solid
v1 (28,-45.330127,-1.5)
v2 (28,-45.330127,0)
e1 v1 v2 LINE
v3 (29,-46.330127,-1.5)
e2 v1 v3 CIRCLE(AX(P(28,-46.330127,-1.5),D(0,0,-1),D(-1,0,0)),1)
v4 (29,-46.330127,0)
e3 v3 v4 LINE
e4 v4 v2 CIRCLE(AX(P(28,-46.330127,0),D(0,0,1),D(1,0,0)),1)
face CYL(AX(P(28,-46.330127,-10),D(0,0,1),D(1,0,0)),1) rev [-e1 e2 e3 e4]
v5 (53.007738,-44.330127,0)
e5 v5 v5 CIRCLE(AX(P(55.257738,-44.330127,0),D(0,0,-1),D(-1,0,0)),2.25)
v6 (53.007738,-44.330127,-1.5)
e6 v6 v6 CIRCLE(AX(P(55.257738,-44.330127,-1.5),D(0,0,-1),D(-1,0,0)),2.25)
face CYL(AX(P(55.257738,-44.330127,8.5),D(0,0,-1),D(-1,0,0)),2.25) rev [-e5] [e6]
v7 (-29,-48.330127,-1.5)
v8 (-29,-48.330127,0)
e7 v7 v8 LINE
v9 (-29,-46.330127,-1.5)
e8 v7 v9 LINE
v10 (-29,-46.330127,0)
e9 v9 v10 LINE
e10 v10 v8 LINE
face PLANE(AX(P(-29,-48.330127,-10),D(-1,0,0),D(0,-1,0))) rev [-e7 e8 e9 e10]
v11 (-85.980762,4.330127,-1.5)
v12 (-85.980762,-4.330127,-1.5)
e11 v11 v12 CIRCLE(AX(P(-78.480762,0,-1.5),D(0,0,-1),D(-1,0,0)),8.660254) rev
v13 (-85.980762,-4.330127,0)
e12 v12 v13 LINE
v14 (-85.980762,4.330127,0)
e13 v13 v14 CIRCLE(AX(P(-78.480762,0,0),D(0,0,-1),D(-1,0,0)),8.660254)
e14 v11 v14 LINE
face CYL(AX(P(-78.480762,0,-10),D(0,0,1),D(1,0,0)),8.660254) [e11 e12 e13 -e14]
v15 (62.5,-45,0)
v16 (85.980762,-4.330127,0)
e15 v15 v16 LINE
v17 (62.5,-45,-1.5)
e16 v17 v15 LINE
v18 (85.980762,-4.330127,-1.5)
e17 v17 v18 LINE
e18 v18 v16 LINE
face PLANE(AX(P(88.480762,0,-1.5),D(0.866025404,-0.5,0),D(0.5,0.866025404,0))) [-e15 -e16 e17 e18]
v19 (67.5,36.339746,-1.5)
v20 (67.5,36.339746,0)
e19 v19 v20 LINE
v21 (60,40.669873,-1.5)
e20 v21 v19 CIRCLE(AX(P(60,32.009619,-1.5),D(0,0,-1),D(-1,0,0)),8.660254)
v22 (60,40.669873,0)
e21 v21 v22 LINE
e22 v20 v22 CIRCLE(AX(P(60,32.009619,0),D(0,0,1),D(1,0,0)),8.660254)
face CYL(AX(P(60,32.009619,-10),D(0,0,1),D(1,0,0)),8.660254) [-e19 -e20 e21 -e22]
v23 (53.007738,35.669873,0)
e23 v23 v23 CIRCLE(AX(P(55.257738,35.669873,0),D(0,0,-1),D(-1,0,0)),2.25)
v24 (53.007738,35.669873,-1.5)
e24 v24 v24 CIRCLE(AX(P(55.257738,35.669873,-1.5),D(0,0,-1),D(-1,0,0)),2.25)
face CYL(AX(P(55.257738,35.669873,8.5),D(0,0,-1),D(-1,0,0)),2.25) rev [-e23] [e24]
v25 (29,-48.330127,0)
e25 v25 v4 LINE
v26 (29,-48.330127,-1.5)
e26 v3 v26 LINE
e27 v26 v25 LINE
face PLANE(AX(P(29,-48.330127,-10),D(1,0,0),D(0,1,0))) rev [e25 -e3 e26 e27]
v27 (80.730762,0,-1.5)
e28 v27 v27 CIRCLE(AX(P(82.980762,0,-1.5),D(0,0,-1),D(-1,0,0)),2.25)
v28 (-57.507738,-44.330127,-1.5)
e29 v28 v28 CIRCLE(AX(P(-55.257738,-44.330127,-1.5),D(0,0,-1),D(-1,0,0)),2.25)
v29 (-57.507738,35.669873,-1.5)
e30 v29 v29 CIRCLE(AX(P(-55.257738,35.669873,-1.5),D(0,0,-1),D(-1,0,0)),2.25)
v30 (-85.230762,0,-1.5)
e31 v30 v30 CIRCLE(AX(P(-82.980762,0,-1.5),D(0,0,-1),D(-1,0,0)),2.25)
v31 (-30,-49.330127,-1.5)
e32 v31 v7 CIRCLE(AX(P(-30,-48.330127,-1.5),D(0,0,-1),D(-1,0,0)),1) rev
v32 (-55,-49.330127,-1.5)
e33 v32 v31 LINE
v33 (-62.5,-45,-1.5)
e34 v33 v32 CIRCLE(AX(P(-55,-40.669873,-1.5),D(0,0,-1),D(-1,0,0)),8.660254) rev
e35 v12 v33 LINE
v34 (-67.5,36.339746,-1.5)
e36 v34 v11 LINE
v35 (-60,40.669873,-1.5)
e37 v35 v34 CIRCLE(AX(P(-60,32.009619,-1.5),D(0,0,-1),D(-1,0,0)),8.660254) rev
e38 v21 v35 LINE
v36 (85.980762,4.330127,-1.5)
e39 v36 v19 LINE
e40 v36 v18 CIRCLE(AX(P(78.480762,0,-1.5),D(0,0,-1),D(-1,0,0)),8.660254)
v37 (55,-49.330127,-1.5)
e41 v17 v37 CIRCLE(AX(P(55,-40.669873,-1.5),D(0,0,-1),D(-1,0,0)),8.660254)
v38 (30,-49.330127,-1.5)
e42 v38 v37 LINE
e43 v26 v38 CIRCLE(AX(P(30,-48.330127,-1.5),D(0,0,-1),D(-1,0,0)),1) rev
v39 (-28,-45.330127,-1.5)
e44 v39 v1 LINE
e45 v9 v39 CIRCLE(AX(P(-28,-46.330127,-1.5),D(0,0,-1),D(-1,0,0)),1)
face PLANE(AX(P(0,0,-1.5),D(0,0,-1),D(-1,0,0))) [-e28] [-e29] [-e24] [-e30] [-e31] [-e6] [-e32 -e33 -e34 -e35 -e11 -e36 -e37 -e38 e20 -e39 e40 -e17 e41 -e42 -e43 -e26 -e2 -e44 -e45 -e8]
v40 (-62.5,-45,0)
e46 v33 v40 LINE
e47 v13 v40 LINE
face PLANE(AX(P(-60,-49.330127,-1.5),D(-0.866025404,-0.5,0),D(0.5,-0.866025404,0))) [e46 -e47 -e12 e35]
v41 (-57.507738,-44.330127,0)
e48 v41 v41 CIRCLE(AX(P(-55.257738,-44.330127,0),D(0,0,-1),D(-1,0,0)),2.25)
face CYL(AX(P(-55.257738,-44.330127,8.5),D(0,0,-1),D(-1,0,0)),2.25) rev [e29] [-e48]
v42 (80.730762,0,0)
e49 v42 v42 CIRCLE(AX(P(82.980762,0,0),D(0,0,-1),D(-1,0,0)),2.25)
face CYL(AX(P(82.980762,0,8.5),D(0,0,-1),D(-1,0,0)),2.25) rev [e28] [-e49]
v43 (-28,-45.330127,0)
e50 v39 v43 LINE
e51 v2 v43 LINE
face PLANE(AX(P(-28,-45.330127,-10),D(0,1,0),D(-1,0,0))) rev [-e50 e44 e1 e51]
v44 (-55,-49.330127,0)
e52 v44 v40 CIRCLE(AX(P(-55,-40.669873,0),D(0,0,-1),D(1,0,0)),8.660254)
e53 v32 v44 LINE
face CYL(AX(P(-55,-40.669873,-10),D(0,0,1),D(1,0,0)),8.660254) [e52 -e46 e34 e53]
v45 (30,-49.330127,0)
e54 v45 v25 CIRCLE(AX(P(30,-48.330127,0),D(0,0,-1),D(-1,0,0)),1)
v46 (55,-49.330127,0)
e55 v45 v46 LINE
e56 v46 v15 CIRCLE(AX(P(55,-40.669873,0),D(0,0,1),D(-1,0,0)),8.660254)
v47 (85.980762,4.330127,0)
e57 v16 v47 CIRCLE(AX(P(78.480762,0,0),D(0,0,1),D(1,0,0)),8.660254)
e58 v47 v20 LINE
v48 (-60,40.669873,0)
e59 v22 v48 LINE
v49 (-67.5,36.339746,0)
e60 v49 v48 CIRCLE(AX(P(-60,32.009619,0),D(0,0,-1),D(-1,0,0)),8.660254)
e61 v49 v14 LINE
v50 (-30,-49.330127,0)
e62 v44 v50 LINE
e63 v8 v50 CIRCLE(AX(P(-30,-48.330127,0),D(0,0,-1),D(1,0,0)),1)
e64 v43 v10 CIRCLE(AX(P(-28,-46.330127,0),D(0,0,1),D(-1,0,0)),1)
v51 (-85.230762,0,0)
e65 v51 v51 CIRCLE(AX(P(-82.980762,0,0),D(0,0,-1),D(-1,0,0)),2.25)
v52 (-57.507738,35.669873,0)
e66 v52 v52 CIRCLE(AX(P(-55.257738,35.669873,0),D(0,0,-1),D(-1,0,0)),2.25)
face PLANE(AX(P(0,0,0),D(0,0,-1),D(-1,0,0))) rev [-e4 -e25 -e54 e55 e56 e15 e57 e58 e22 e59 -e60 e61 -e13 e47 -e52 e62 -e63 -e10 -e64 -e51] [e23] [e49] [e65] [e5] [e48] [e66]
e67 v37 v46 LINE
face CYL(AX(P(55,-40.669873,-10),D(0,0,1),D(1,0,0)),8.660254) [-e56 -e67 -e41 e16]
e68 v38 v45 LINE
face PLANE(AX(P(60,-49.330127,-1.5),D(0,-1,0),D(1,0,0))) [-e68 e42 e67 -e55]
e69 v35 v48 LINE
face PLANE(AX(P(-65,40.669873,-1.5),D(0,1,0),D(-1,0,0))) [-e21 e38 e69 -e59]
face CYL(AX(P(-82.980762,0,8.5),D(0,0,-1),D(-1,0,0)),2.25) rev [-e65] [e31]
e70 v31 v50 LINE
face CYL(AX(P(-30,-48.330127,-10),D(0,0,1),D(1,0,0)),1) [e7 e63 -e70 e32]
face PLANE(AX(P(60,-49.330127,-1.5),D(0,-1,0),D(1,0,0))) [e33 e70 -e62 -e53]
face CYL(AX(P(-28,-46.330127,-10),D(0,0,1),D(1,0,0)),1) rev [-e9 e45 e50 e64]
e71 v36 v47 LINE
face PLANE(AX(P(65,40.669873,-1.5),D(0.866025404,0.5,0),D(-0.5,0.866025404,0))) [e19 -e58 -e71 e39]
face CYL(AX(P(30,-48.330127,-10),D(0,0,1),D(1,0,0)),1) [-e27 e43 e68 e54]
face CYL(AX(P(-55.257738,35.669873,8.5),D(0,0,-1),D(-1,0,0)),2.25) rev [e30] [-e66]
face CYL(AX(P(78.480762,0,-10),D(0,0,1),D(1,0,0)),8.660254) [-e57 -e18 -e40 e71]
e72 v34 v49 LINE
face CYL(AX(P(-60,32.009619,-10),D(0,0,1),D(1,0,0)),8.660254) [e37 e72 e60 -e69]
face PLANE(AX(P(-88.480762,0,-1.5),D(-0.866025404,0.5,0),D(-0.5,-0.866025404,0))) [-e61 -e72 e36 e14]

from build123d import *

# Parameters (mm, degrees)
FLANGE_BASE1_DEPTH    = 1.5
ESBO_O7_R             = 2.25
CORTE_EXTRUS_O1_DEPTH = 10
CORTE_EXTRUS_O3_DEPTH = 10
CORTE_EXTRUS_O4_DEPTH = 10


# Sheet-metal steps are written as plain solids
with BuildPart() as part:
    # Esboço2 → Flange-base1 (new body)
    with BuildSketch(Plane.XY):
        Polygon((60, -49.330127019), (-60, -49.330127019), (-88.480762114, 0), (-65, 40.669872981), (65, 40.669872981), (88.480762114, 0), align=None)
    extrude(amount=-FLANGE_BASE1_DEPTH)

    # Esboço7 → Corte-extrusão1 (cut)
    with BuildSketch(Plane(origin=(0, 0, -1.5), x_dir=(-1, 0, 0), z_dir=(0, 0, -1))):
        with Locations((-82.980762114, 0)):
            Circle(ESBO_O7_R)
        with Locations((-55.257737945, -44.330127019)):
            Circle(ESBO_O7_R)
        with Locations((55.257737945, -44.330127019)):
            Circle(ESBO_O7_R)
        with Locations((82.980762114, 0)):
            Circle(ESBO_O7_R)
        with Locations((55.257737945, 35.669872981)):
            Circle(ESBO_O7_R)
        with Locations((-55.257737945, 35.669872981)):
            Circle(ESBO_O7_R)
    extrude(amount=-CORTE_EXTRUS_O1_DEPTH, mode=Mode.SUBTRACT)

    # Esboço8 → Corte-extrusão3 (cut)
    with BuildSketch(Plane.XY):
        with BuildLine():
            Line((-85.980762114, -4.330127019), (-62.5, -45))
            ThreePointArc((-62.5, -45), (-59.330127019, -48.169872981), (-55, -49.330127019))
            Line((-55, -49.330127019), (-88.480762114, -49.330127019))
            Line((-88.480762114, -49.330127019), (-88.480762114, 40.669872981))
            Line((-88.480762114, 40.669872981), (-60, 40.669872981))
            ThreePointArc((-60, 40.669872981), (-64.330127019, 39.509618943), (-67.5, 36.339745962))
            Line((-67.5, 36.339745962), (-85.980762114, 4.330127019))
            ThreePointArc((-85.980762114, 4.330127019), (-87.141016151, 0), (-85.980762114, -4.330127019))
        make_face()
    corte_extrus_o3 = extrude(amount=-CORTE_EXTRUS_O3_DEPTH, mode=Mode.SUBTRACT)

    # Espelhar1: Corte-extrusão3 across plane
    add(corte_extrus_o3.mirror(Plane(origin=(0, 0, 0), x_dir=(0, 0, 1), z_dir=(1, 0, 0))), mode=Mode.SUBTRACT)

    # Esboço9 → Corte-extrusão4 (cut)
    with BuildSketch(Plane.XY):
        with BuildLine():
            Line((-29, -48.330127019), (-29, -46.330127019))
            ThreePointArc((-29, -46.330127019), (-28.707106781, -45.623020238), (-28, -45.330127019))
            Line((-28, -45.330127019), (28, -45.330127019))
            ThreePointArc((28, -45.330127019), (28.707106781, -45.623020238), (29, -46.330127019))
            Line((29, -46.330127019), (29, -48.330127019))
            ThreePointArc((29, -48.330127019), (29.292893219, -49.0372338), (30, -49.330127019))
            Line((30, -49.330127019), (-30, -49.330127019))
            ThreePointArc((-30, -49.330127019), (-29.292893219, -49.0372338), (-29, -48.330127019))
        make_face()
    extrude(amount=-CORTE_EXTRUS_O4_DEPTH, mode=Mode.SUBTRACT)


solid = part.part
